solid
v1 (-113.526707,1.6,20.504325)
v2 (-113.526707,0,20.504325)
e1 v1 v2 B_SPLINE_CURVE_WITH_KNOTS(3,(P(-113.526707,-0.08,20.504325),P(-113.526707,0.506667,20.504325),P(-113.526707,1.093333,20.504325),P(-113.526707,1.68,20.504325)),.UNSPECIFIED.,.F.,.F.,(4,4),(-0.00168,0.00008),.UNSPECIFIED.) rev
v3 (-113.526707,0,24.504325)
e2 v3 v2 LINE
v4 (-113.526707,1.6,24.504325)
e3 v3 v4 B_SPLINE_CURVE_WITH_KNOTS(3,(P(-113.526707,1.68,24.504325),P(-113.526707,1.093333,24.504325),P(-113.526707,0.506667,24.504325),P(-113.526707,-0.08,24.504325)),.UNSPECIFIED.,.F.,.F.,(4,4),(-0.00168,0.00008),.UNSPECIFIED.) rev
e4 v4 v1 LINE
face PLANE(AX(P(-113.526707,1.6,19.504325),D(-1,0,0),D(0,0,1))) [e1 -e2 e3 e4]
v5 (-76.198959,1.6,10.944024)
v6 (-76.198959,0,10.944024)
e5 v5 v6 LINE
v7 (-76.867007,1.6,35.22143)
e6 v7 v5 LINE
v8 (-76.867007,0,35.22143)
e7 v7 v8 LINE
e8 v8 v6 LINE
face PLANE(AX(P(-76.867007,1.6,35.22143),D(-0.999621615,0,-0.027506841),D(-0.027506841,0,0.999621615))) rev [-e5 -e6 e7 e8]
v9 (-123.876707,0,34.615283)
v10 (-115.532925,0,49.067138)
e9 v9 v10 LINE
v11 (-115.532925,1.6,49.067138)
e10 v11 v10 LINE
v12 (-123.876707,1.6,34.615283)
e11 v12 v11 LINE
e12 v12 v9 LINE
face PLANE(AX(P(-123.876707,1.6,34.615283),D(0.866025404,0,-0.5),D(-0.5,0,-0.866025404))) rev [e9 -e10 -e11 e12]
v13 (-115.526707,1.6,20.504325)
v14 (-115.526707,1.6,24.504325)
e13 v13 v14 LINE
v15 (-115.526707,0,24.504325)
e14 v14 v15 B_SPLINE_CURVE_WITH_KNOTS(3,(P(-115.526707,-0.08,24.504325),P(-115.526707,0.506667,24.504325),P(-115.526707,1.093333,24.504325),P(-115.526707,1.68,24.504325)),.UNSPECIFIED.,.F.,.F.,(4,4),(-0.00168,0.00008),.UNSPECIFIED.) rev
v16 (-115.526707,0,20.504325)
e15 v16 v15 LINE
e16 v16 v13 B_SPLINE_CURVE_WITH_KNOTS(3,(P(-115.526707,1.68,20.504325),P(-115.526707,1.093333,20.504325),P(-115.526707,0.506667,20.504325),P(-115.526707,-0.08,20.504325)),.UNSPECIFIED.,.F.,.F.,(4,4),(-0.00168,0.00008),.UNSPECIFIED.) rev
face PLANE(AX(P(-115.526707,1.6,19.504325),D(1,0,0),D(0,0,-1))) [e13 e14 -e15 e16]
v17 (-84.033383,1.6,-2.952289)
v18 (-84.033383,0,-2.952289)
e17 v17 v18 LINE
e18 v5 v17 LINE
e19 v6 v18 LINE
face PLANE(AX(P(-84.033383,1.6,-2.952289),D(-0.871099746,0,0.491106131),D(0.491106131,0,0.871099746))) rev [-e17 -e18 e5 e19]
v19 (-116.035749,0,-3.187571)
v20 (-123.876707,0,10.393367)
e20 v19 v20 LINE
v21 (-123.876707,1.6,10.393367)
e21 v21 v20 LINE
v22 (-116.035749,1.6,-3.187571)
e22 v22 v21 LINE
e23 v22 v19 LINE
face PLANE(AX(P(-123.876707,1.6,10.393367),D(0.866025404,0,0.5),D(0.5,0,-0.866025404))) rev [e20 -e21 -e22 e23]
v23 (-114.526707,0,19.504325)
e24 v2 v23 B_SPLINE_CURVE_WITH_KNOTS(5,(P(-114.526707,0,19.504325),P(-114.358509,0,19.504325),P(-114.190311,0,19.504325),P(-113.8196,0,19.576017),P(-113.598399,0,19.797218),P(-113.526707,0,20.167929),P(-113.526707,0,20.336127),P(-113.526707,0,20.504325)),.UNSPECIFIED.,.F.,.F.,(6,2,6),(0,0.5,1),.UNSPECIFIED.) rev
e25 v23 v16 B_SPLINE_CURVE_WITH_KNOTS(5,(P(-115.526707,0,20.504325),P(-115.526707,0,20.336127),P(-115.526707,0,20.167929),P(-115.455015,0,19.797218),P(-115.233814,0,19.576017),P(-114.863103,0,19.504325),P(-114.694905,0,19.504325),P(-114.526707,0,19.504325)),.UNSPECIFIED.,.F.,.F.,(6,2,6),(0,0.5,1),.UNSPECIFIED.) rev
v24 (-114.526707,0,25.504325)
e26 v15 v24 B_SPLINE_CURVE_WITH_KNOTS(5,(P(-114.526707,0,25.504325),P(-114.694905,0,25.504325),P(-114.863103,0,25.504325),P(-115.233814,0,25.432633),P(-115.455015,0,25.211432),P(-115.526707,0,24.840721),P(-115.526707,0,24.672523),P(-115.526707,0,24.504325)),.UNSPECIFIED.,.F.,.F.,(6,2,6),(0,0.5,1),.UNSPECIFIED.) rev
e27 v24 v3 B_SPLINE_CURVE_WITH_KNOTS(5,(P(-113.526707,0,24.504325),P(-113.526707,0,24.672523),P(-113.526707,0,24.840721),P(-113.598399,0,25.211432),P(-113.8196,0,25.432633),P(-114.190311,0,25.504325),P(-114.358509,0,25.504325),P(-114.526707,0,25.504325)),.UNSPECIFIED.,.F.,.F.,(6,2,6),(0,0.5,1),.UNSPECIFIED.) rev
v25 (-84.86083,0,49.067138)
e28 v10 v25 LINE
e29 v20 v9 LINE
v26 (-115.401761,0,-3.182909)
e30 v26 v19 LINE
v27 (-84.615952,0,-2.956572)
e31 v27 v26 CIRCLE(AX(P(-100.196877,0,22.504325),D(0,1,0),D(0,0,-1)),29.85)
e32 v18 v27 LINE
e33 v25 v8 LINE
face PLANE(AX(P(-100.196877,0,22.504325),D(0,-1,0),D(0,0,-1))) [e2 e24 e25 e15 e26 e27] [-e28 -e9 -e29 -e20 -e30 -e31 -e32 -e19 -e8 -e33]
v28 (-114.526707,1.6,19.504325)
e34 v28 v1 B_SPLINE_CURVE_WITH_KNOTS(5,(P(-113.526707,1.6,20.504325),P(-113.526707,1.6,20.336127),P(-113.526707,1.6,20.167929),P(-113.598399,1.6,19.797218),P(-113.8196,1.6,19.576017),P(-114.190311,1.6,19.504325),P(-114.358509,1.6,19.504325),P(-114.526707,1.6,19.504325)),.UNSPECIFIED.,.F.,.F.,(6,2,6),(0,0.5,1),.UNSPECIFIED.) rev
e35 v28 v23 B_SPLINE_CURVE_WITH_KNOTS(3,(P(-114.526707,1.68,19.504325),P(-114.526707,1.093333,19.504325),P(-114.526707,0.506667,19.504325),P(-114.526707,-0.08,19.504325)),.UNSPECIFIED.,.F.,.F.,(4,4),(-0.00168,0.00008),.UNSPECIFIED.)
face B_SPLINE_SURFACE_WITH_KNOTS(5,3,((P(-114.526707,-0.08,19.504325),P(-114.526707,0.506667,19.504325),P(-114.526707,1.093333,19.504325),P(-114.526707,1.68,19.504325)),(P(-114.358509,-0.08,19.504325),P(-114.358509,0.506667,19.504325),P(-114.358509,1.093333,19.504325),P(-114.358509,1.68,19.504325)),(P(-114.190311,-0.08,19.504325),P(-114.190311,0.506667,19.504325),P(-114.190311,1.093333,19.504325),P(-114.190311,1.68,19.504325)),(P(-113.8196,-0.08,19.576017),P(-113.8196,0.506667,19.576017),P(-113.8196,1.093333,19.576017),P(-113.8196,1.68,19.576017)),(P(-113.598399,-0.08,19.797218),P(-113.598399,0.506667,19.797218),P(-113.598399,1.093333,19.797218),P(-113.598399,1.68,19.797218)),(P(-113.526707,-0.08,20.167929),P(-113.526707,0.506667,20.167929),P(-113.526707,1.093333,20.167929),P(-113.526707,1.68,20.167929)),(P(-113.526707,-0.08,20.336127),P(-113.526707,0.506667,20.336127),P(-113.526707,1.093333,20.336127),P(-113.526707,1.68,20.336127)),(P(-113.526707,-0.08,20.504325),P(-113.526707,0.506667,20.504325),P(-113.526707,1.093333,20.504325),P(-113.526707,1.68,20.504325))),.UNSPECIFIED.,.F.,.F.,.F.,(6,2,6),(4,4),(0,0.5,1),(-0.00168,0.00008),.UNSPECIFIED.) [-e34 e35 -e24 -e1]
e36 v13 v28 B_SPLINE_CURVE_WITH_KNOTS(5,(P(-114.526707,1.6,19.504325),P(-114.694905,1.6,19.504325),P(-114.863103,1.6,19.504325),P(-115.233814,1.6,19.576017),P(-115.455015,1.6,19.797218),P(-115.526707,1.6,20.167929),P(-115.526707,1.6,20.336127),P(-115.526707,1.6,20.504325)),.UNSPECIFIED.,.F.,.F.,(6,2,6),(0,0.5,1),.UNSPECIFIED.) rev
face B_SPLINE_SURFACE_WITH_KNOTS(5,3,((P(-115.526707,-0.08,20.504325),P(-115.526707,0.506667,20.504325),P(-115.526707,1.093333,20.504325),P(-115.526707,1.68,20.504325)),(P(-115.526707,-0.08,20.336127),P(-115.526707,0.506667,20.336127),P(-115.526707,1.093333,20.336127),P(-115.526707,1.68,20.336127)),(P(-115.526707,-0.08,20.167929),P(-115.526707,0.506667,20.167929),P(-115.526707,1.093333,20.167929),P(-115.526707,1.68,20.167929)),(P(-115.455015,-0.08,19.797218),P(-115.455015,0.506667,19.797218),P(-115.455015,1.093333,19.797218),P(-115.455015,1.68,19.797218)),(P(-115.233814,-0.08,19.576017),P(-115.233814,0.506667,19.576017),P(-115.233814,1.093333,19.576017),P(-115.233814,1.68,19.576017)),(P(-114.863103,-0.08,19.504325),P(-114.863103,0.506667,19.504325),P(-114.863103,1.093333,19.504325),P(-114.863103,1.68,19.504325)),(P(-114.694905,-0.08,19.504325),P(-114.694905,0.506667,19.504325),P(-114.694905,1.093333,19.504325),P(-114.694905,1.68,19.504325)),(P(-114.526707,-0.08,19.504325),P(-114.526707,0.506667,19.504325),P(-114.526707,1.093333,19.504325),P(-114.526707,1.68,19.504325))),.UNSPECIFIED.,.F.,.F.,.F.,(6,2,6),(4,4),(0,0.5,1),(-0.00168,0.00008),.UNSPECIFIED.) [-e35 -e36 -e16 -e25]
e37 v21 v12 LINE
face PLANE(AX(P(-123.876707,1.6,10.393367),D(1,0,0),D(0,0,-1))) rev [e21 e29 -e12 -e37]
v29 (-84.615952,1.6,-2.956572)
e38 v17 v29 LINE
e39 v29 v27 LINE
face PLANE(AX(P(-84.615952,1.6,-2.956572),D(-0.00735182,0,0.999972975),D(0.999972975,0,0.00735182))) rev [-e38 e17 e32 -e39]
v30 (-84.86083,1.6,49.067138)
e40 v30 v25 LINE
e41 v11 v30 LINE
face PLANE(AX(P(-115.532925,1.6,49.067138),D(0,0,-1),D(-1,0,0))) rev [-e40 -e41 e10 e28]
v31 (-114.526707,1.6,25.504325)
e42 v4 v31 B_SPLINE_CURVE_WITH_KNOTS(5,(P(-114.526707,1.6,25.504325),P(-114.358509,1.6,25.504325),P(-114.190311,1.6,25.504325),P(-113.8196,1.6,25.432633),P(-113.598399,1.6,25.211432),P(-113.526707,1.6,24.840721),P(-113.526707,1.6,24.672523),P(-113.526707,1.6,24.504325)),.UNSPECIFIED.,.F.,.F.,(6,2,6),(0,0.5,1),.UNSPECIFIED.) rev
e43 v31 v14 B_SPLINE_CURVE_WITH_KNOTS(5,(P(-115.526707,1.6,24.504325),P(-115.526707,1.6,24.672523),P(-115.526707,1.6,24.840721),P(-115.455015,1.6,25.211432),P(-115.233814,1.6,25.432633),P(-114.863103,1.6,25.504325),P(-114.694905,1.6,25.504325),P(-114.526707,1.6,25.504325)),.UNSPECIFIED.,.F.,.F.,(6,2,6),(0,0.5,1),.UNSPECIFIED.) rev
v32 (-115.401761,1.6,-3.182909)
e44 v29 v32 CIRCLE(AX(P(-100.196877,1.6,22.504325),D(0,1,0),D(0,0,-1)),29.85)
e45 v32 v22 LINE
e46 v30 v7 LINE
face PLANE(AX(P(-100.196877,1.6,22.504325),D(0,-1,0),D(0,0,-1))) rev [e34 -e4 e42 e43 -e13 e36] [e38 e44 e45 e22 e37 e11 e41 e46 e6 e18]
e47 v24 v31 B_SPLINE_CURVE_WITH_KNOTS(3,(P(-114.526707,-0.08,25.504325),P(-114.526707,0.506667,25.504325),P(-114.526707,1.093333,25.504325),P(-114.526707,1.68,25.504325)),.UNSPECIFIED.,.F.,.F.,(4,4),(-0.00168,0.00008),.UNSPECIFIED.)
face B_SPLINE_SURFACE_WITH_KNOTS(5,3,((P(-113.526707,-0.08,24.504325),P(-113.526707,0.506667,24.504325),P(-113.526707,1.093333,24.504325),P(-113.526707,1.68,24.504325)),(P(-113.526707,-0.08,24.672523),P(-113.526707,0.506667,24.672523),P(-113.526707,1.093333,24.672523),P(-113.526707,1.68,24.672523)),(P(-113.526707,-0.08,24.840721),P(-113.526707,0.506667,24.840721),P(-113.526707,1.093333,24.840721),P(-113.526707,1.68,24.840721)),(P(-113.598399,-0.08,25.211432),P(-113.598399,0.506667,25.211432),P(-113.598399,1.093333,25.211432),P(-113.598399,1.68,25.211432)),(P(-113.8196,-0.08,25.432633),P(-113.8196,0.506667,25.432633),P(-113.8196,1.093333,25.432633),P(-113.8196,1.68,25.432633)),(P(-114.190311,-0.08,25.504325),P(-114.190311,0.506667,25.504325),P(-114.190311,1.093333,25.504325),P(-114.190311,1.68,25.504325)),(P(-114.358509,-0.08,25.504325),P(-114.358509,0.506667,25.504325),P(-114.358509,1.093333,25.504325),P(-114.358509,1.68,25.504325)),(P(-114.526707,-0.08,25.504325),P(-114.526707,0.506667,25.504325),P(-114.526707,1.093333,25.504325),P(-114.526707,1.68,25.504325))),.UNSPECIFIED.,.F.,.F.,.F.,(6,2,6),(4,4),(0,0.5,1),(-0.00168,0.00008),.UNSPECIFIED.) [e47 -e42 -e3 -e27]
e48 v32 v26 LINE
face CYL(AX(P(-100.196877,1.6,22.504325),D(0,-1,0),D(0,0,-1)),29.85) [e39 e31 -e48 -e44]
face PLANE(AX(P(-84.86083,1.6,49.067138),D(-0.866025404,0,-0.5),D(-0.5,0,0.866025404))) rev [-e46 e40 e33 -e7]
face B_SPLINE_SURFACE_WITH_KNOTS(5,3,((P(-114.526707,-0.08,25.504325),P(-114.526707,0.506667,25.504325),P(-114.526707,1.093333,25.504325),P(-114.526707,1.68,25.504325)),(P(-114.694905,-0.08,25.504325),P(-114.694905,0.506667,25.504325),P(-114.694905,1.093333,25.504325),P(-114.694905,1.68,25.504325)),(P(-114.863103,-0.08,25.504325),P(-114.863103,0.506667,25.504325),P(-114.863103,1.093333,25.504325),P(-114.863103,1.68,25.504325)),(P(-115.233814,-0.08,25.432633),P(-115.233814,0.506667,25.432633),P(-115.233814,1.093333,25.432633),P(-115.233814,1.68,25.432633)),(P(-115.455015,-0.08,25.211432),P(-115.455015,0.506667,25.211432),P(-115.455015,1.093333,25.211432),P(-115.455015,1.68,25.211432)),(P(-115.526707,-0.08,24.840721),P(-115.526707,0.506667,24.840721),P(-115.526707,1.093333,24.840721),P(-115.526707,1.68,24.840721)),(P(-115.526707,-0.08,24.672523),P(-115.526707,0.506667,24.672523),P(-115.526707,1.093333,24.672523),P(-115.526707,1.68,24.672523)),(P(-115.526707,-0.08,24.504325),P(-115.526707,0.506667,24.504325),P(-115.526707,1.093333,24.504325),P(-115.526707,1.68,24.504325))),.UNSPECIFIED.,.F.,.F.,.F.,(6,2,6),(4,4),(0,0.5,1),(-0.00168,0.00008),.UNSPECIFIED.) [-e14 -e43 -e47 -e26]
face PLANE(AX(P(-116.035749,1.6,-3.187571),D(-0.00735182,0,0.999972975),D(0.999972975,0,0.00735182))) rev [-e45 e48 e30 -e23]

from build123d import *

# Parameters (mm, degrees)
SKETCH2_W           = 2
SKETCH2_H           = 6
BOSS_EXTRUDE1_DEPTH = 1.6
FILLET1_SIZE        = 1


with BuildPart() as part:
    # Sketch2 → Boss-Extrude1 (new body)
    with BuildSketch(Plane(origin=(0, 0, 0), x_dir=(1, 0, 0), z_dir=(0, 1, 0))):
        with BuildLine():
            Line((-123.876706844, -10.393367026), (-123.876706844, -34.615283413))
            Line((-123.876706844, -34.615283413), (-115.532924627, -49.06713814))
            Line((-115.532924627, -49.06713814), (-84.860830246, -49.06713814))
            Line((-84.860830246, -49.06713814), (-76.867006735, -35.221429673))
            Line((-76.867006735, -35.221429673), (-76.19895922, -10.944023897))
            Line((-76.19895922, -10.944023897), (-84.03338266, 2.952288601))
            Line((-84.03338266, 2.952288601), (-84.615952241, 2.956571663))
            ThreePointArc((-84.615952241, 2.956571663), (-99.977425615, 7.344868085), (-115.401760623, 3.182909496))
            Line((-115.401760623, 3.182909496), (-116.035748857, 3.187570589))
            Line((-116.035748857, 3.187570589), (-123.876706844, -10.393367026))
        make_face()
        with Locations((-114.526706844, -22.504325219)):
            Rectangle(SKETCH2_W, SKETCH2_H, mode=Mode.SUBTRACT)
    extrude(amount=BOSS_EXTRUDE1_DEPTH)

    # Fillet1
    # a fillet whose section is not a circle: 1 mm, written as the material it adds along each edge
    with BuildSketch(Plane(origin=(-113.526706844, 0, 25.504325219), x_dir=(0, 0, -1), z_dir=(0, 1, 0)), Plane(origin=(-115.526706844, 0, 25.504325219), x_dir=(1, 0, 0), z_dir=(0, 1, 0)), Plane(origin=(-115.526706844, 0, 19.504325219), x_dir=(0, 0, 1), z_dir=(0, 1, 0))) as fillet1_piece_1:
        with BuildLine():
            add(Edge.make_bspline([(FILLET1_SIZE, 0), (FILLET1_SIZE * 0.831801948466, 0), (FILLET1_SIZE * 0.663603896932, 0), (FILLET1_SIZE * 0.292893218813, FILLET1_SIZE * 0.0716919198361), (FILLET1_SIZE * 0.0716919198361, FILLET1_SIZE * 0.292893218813), (0, FILLET1_SIZE * 0.663603896932), (0, FILLET1_SIZE * 0.831801948466), (0, FILLET1_SIZE)], knots=[0, 0, 0, 0, 0, 0, 0.5, 0.5, 1, 1, 1, 1, 1, 1], degree=5))
            Line((0, FILLET1_SIZE), (-FILLET1_SIZE * 0.02, FILLET1_SIZE))
            Line((-FILLET1_SIZE * 0.02, FILLET1_SIZE), (-FILLET1_SIZE * 0.02, -FILLET1_SIZE * 0.02))
            Line((-FILLET1_SIZE * 0.02, -FILLET1_SIZE * 0.02), (FILLET1_SIZE, -FILLET1_SIZE * 0.02))
            Line((FILLET1_SIZE, -FILLET1_SIZE * 0.02), (FILLET1_SIZE, 0))
        make_face()
    extrude(amount=1.6)
    with BuildSketch(Plane(origin=(-113.526706844, 0, 19.504325219), x_dir=(0, 0, 1), z_dir=(0, 1, 0))) as fillet1_piece_2:
        with BuildLine():
            add(Edge.make_bspline([(FILLET1_SIZE, 0), (FILLET1_SIZE * 0.831801948466, 0), (FILLET1_SIZE * 0.663603896932, 0), (FILLET1_SIZE * 0.292893218813, -FILLET1_SIZE * 0.0716919198361), (FILLET1_SIZE * 0.0716919198361, -FILLET1_SIZE * 0.292893218813), (0, -FILLET1_SIZE * 0.663603896932), (0, -FILLET1_SIZE * 0.831801948466), (0, -FILLET1_SIZE)], knots=[0, 0, 0, 0, 0, 0, 0.5, 0.5, 1, 1, 1, 1, 1, 1], degree=5))
            Line((0, -FILLET1_SIZE), (-FILLET1_SIZE * 0.02, -FILLET1_SIZE))
            Line((-FILLET1_SIZE * 0.02, -FILLET1_SIZE), (-FILLET1_SIZE * 0.02, FILLET1_SIZE * 0.02))
            Line((-FILLET1_SIZE * 0.02, FILLET1_SIZE * 0.02), (FILLET1_SIZE, FILLET1_SIZE * 0.02))
            Line((FILLET1_SIZE, FILLET1_SIZE * 0.02), (FILLET1_SIZE, 0))
        make_face()
    extrude(amount=1.6)


solid = part.part
